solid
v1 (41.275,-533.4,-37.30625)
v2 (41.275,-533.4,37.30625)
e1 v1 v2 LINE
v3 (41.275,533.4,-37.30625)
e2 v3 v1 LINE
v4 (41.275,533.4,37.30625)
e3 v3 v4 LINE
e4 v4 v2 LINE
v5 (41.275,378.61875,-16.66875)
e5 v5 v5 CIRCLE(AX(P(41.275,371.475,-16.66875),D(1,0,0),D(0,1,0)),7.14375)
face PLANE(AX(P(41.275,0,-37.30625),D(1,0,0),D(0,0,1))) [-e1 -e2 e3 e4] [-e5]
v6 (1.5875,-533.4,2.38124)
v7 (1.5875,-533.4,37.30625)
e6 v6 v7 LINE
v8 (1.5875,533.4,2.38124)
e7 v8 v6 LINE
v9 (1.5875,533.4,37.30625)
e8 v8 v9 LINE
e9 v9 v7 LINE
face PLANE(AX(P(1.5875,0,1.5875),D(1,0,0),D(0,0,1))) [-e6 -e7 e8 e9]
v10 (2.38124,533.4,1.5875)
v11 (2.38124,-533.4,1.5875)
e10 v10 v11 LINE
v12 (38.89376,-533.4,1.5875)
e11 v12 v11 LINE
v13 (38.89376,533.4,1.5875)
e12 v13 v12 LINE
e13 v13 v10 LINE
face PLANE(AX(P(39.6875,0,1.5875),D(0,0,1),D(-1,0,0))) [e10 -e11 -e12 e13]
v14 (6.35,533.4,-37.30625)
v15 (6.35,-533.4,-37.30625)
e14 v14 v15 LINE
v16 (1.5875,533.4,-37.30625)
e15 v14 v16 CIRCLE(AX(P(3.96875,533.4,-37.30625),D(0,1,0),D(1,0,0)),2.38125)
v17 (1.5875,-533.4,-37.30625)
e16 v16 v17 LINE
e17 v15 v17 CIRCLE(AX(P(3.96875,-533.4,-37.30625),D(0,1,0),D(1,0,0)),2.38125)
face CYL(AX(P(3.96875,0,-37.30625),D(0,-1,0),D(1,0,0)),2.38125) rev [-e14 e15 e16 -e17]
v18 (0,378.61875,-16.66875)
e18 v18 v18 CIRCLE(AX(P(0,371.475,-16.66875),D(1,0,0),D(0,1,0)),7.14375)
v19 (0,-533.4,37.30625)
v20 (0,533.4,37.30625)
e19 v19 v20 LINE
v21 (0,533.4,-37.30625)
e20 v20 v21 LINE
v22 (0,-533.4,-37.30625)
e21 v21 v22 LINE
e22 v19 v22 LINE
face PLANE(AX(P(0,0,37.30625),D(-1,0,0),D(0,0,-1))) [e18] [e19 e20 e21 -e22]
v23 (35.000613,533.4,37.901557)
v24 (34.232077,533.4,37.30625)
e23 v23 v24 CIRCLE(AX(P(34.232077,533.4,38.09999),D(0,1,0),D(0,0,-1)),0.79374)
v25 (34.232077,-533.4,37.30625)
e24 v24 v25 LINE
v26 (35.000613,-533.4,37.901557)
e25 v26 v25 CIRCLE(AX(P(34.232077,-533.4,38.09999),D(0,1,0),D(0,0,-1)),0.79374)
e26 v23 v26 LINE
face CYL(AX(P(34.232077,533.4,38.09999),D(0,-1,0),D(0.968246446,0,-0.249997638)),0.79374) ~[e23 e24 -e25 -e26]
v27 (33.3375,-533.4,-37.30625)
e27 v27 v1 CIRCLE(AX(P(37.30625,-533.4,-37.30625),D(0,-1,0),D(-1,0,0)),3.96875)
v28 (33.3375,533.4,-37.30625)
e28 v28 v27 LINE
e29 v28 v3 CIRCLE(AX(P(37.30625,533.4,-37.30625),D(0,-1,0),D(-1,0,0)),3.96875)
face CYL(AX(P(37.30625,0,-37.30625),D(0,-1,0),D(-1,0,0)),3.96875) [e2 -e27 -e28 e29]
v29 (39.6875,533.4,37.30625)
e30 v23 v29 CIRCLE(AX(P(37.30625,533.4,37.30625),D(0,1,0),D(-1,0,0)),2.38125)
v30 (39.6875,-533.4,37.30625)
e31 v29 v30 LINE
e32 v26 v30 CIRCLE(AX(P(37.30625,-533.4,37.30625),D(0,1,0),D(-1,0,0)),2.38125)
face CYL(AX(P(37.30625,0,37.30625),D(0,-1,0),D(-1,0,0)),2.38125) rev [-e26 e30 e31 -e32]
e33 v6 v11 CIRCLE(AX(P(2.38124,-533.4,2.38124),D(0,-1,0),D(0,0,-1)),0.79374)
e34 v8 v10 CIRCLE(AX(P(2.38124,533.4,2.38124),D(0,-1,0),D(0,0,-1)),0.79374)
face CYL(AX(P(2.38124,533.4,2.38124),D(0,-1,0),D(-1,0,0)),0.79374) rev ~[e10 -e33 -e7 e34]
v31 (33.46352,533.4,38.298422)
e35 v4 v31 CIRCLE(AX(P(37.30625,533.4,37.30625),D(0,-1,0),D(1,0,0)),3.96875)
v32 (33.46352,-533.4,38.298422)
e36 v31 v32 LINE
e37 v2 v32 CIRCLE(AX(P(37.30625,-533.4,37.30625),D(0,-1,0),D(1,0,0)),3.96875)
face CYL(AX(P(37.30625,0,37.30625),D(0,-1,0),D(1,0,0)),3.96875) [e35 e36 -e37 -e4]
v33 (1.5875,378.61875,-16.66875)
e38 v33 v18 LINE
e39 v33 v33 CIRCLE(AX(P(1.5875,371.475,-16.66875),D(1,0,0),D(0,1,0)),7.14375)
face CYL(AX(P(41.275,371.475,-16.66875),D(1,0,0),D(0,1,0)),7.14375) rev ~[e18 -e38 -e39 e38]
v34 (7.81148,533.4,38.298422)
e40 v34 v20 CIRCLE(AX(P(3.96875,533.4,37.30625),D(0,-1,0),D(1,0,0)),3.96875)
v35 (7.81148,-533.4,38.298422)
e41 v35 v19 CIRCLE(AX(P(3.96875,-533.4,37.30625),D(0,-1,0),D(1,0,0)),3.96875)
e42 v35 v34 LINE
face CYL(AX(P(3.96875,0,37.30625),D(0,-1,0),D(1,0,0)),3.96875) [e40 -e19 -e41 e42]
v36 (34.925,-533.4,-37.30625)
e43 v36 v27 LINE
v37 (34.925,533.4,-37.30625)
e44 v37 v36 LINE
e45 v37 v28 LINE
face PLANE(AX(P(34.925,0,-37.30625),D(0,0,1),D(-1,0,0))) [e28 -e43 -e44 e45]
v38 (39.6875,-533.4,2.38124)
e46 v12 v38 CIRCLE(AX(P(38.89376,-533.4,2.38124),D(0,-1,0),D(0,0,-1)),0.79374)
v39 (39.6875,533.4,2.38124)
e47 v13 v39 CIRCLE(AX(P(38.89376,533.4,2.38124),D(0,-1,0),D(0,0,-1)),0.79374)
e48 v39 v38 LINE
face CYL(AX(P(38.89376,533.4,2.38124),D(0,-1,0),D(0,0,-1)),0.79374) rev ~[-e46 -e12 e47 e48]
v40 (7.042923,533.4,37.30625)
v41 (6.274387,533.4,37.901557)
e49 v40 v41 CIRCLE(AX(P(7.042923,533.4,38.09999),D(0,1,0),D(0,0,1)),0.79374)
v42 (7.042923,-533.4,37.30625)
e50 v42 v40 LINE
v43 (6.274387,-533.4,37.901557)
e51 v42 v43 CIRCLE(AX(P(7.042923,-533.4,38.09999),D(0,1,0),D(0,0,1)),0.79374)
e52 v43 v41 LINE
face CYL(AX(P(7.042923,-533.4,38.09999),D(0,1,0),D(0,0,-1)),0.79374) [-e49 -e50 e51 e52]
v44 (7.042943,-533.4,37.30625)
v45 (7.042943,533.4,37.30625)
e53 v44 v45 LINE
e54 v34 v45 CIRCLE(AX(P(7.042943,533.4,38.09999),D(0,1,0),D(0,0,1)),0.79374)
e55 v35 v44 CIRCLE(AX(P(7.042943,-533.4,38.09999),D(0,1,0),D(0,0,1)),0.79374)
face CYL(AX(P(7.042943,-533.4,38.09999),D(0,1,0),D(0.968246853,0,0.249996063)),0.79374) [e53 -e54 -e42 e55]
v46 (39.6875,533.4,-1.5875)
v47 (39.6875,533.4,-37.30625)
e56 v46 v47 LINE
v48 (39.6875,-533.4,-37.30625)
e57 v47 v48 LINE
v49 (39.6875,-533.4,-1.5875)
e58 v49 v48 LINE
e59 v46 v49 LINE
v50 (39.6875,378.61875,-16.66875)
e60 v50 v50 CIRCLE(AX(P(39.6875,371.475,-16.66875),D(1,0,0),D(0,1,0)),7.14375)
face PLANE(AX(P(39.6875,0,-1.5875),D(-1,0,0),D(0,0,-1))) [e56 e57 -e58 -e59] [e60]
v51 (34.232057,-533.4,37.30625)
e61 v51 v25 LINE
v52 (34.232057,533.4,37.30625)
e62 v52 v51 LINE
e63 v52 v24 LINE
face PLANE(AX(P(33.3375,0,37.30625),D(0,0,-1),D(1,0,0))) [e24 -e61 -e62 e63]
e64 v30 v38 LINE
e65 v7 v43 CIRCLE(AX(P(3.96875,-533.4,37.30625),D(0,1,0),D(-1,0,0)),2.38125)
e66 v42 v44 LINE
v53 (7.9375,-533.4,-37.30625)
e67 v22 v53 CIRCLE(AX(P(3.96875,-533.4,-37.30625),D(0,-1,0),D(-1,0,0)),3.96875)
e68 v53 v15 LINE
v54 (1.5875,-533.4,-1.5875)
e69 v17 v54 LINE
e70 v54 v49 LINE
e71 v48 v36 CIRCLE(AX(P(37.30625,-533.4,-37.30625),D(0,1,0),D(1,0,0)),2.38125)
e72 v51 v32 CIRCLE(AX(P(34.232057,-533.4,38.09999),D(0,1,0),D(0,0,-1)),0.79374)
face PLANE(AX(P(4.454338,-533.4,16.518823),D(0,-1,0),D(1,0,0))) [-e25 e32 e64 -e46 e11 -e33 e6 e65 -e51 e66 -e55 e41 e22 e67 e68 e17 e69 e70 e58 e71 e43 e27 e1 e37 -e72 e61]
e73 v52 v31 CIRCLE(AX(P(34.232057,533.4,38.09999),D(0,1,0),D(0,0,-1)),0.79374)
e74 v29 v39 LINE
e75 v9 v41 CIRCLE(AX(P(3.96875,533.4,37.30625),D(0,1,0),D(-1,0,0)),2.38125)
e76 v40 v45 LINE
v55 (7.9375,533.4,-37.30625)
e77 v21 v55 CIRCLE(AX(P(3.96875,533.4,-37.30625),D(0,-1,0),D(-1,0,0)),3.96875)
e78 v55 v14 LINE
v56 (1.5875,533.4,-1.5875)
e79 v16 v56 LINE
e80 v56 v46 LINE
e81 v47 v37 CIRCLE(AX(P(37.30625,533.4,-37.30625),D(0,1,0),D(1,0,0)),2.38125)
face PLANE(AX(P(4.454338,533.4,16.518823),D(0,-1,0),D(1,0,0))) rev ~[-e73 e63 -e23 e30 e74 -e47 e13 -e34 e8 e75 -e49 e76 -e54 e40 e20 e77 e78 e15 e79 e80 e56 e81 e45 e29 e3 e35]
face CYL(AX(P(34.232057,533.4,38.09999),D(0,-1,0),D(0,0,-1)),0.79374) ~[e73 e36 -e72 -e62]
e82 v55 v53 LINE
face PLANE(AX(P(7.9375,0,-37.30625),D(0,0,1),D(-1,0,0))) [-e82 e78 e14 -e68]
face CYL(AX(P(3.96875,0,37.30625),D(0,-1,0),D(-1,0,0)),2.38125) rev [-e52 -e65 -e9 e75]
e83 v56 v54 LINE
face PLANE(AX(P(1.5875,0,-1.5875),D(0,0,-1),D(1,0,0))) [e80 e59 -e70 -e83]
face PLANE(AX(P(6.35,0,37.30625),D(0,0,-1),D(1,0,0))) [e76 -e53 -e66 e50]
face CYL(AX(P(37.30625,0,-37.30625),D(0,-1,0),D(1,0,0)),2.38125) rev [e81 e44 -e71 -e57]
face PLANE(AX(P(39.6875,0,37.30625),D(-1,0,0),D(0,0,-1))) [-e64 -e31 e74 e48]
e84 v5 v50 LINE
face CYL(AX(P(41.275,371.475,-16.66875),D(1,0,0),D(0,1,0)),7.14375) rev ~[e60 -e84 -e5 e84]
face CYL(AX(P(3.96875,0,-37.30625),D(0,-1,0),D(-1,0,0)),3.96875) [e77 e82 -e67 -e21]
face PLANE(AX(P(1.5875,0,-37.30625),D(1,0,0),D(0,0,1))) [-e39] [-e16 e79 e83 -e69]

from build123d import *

# Parameters (mm, degrees)
F1_DEPTH = 533.4
F2_R     = 0.79374
F3_R     = 7.14375
F4_DEPTH = 41.276


# Not quite as in the source:
# - a fillet or chamfer is up to 0.001 mm smaller than in the source, because OpenCascade refuses the exact size


with BuildPart() as f1:
    # F0 (on Front) → F1 (new body, symmetric)
    with BuildSketch(Plane.XZ):
        with BuildLine():
            Line((0, 37.30625), (0, 0))
            Line((0, 0), (20.6375, 0))
            Line((20.6375, 0), (20.6375, 1.5875))
            Line((20.6375, 1.5875), (1.5875, 1.5875))
            Line((1.5875, 1.5875), (1.5875, 37.30625))
            ThreePointArc((1.5875, 37.30625), (3.96875, 39.6875), (6.35, 37.30625))
            Line((6.35, 37.30625), (7.9375, 37.30625))
            ThreePointArc((7.9375, 37.30625), (3.96875, 41.275), (0, 37.30625))
        make_face()
        with BuildLine():
            Line((20.6375, 0), (0, 0))
            Line((0, 0), (0, -37.30625))
            ThreePointArc((0, -37.30625), (3.96875, -41.275), (7.9375, -37.30625))
            Line((7.9375, -37.30625), (6.35, -37.30625))
            ThreePointArc((6.35, -37.30625), (3.96875, -39.6875), (1.5875, -37.30625))
            Line((1.5875, -37.30625), (1.5875, -1.5875))
            Line((1.5875, -1.5875), (20.6375, -1.5875))
            Line((20.6375, -1.5875), (20.6375, 0))
        make_face()
        with BuildLine():
            Line((20.6375, 1.5875), (20.6375, 0))
            Line((20.6375, 0), (41.275, 0))
            Line((41.275, 0), (41.275, 37.30625))
            ThreePointArc((41.275, 37.30625), (37.30625, 41.275), (33.3375, 37.30625))
            Line((33.3375, 37.30625), (34.925, 37.30625))
            ThreePointArc((34.925, 37.30625), (37.30625, 39.6875), (39.6875, 37.30625))
            Line((39.6875, 37.30625), (39.6875, 1.5875))
            Line((39.6875, 1.5875), (20.6375, 1.5875))
        make_face()
        with BuildLine():
            Line((41.275, 0), (20.6375, 0))
            Line((20.6375, 0), (20.6375, -1.5875))
            Line((20.6375, -1.5875), (39.6875, -1.5875))
            Line((39.6875, -1.5875), (39.6875, -37.30625))
            ThreePointArc((39.6875, -37.30625), (37.30625, -39.6875), (34.925, -37.30625))
            Line((34.925, -37.30625), (33.3375, -37.30625))
            ThreePointArc((33.3375, -37.30625), (37.30625, -41.275), (41.275, -37.30625))
            Line((41.275, -37.30625), (41.275, 0))
        make_face()
    extrude(amount=F1_DEPTH, both=True)

    # F2 (radius 0.79375 in the source; OpenCascade refuses exactly that, so slightly less here)
    f2_edges = [f1.edges().sort_by_distance(p)[0] for p in [
        (6.35, 0, 37.30625),
        (7.9375, 0, 37.30625),
        (33.3375, 0, 37.30625),
        (34.925, 0, 37.30625),
        (0, 0, 37.30625),
        (41.275, 0, 37.30625),
        (39.6875, 0, 1.5875),
        (1.5875, 0, 1.5875),
    ]]
    fillet(f2_edges, radius=F2_R)

    # F3 (on face) → F4 (cut, through all)
    with BuildSketch(Plane.YZ.offset(41.275)):
        with Locations((371.475, -16.66875)):
            Circle(F3_R)
    extrude(amount=-F4_DEPTH, mode=Mode.SUBTRACT)


solid = f1.part
